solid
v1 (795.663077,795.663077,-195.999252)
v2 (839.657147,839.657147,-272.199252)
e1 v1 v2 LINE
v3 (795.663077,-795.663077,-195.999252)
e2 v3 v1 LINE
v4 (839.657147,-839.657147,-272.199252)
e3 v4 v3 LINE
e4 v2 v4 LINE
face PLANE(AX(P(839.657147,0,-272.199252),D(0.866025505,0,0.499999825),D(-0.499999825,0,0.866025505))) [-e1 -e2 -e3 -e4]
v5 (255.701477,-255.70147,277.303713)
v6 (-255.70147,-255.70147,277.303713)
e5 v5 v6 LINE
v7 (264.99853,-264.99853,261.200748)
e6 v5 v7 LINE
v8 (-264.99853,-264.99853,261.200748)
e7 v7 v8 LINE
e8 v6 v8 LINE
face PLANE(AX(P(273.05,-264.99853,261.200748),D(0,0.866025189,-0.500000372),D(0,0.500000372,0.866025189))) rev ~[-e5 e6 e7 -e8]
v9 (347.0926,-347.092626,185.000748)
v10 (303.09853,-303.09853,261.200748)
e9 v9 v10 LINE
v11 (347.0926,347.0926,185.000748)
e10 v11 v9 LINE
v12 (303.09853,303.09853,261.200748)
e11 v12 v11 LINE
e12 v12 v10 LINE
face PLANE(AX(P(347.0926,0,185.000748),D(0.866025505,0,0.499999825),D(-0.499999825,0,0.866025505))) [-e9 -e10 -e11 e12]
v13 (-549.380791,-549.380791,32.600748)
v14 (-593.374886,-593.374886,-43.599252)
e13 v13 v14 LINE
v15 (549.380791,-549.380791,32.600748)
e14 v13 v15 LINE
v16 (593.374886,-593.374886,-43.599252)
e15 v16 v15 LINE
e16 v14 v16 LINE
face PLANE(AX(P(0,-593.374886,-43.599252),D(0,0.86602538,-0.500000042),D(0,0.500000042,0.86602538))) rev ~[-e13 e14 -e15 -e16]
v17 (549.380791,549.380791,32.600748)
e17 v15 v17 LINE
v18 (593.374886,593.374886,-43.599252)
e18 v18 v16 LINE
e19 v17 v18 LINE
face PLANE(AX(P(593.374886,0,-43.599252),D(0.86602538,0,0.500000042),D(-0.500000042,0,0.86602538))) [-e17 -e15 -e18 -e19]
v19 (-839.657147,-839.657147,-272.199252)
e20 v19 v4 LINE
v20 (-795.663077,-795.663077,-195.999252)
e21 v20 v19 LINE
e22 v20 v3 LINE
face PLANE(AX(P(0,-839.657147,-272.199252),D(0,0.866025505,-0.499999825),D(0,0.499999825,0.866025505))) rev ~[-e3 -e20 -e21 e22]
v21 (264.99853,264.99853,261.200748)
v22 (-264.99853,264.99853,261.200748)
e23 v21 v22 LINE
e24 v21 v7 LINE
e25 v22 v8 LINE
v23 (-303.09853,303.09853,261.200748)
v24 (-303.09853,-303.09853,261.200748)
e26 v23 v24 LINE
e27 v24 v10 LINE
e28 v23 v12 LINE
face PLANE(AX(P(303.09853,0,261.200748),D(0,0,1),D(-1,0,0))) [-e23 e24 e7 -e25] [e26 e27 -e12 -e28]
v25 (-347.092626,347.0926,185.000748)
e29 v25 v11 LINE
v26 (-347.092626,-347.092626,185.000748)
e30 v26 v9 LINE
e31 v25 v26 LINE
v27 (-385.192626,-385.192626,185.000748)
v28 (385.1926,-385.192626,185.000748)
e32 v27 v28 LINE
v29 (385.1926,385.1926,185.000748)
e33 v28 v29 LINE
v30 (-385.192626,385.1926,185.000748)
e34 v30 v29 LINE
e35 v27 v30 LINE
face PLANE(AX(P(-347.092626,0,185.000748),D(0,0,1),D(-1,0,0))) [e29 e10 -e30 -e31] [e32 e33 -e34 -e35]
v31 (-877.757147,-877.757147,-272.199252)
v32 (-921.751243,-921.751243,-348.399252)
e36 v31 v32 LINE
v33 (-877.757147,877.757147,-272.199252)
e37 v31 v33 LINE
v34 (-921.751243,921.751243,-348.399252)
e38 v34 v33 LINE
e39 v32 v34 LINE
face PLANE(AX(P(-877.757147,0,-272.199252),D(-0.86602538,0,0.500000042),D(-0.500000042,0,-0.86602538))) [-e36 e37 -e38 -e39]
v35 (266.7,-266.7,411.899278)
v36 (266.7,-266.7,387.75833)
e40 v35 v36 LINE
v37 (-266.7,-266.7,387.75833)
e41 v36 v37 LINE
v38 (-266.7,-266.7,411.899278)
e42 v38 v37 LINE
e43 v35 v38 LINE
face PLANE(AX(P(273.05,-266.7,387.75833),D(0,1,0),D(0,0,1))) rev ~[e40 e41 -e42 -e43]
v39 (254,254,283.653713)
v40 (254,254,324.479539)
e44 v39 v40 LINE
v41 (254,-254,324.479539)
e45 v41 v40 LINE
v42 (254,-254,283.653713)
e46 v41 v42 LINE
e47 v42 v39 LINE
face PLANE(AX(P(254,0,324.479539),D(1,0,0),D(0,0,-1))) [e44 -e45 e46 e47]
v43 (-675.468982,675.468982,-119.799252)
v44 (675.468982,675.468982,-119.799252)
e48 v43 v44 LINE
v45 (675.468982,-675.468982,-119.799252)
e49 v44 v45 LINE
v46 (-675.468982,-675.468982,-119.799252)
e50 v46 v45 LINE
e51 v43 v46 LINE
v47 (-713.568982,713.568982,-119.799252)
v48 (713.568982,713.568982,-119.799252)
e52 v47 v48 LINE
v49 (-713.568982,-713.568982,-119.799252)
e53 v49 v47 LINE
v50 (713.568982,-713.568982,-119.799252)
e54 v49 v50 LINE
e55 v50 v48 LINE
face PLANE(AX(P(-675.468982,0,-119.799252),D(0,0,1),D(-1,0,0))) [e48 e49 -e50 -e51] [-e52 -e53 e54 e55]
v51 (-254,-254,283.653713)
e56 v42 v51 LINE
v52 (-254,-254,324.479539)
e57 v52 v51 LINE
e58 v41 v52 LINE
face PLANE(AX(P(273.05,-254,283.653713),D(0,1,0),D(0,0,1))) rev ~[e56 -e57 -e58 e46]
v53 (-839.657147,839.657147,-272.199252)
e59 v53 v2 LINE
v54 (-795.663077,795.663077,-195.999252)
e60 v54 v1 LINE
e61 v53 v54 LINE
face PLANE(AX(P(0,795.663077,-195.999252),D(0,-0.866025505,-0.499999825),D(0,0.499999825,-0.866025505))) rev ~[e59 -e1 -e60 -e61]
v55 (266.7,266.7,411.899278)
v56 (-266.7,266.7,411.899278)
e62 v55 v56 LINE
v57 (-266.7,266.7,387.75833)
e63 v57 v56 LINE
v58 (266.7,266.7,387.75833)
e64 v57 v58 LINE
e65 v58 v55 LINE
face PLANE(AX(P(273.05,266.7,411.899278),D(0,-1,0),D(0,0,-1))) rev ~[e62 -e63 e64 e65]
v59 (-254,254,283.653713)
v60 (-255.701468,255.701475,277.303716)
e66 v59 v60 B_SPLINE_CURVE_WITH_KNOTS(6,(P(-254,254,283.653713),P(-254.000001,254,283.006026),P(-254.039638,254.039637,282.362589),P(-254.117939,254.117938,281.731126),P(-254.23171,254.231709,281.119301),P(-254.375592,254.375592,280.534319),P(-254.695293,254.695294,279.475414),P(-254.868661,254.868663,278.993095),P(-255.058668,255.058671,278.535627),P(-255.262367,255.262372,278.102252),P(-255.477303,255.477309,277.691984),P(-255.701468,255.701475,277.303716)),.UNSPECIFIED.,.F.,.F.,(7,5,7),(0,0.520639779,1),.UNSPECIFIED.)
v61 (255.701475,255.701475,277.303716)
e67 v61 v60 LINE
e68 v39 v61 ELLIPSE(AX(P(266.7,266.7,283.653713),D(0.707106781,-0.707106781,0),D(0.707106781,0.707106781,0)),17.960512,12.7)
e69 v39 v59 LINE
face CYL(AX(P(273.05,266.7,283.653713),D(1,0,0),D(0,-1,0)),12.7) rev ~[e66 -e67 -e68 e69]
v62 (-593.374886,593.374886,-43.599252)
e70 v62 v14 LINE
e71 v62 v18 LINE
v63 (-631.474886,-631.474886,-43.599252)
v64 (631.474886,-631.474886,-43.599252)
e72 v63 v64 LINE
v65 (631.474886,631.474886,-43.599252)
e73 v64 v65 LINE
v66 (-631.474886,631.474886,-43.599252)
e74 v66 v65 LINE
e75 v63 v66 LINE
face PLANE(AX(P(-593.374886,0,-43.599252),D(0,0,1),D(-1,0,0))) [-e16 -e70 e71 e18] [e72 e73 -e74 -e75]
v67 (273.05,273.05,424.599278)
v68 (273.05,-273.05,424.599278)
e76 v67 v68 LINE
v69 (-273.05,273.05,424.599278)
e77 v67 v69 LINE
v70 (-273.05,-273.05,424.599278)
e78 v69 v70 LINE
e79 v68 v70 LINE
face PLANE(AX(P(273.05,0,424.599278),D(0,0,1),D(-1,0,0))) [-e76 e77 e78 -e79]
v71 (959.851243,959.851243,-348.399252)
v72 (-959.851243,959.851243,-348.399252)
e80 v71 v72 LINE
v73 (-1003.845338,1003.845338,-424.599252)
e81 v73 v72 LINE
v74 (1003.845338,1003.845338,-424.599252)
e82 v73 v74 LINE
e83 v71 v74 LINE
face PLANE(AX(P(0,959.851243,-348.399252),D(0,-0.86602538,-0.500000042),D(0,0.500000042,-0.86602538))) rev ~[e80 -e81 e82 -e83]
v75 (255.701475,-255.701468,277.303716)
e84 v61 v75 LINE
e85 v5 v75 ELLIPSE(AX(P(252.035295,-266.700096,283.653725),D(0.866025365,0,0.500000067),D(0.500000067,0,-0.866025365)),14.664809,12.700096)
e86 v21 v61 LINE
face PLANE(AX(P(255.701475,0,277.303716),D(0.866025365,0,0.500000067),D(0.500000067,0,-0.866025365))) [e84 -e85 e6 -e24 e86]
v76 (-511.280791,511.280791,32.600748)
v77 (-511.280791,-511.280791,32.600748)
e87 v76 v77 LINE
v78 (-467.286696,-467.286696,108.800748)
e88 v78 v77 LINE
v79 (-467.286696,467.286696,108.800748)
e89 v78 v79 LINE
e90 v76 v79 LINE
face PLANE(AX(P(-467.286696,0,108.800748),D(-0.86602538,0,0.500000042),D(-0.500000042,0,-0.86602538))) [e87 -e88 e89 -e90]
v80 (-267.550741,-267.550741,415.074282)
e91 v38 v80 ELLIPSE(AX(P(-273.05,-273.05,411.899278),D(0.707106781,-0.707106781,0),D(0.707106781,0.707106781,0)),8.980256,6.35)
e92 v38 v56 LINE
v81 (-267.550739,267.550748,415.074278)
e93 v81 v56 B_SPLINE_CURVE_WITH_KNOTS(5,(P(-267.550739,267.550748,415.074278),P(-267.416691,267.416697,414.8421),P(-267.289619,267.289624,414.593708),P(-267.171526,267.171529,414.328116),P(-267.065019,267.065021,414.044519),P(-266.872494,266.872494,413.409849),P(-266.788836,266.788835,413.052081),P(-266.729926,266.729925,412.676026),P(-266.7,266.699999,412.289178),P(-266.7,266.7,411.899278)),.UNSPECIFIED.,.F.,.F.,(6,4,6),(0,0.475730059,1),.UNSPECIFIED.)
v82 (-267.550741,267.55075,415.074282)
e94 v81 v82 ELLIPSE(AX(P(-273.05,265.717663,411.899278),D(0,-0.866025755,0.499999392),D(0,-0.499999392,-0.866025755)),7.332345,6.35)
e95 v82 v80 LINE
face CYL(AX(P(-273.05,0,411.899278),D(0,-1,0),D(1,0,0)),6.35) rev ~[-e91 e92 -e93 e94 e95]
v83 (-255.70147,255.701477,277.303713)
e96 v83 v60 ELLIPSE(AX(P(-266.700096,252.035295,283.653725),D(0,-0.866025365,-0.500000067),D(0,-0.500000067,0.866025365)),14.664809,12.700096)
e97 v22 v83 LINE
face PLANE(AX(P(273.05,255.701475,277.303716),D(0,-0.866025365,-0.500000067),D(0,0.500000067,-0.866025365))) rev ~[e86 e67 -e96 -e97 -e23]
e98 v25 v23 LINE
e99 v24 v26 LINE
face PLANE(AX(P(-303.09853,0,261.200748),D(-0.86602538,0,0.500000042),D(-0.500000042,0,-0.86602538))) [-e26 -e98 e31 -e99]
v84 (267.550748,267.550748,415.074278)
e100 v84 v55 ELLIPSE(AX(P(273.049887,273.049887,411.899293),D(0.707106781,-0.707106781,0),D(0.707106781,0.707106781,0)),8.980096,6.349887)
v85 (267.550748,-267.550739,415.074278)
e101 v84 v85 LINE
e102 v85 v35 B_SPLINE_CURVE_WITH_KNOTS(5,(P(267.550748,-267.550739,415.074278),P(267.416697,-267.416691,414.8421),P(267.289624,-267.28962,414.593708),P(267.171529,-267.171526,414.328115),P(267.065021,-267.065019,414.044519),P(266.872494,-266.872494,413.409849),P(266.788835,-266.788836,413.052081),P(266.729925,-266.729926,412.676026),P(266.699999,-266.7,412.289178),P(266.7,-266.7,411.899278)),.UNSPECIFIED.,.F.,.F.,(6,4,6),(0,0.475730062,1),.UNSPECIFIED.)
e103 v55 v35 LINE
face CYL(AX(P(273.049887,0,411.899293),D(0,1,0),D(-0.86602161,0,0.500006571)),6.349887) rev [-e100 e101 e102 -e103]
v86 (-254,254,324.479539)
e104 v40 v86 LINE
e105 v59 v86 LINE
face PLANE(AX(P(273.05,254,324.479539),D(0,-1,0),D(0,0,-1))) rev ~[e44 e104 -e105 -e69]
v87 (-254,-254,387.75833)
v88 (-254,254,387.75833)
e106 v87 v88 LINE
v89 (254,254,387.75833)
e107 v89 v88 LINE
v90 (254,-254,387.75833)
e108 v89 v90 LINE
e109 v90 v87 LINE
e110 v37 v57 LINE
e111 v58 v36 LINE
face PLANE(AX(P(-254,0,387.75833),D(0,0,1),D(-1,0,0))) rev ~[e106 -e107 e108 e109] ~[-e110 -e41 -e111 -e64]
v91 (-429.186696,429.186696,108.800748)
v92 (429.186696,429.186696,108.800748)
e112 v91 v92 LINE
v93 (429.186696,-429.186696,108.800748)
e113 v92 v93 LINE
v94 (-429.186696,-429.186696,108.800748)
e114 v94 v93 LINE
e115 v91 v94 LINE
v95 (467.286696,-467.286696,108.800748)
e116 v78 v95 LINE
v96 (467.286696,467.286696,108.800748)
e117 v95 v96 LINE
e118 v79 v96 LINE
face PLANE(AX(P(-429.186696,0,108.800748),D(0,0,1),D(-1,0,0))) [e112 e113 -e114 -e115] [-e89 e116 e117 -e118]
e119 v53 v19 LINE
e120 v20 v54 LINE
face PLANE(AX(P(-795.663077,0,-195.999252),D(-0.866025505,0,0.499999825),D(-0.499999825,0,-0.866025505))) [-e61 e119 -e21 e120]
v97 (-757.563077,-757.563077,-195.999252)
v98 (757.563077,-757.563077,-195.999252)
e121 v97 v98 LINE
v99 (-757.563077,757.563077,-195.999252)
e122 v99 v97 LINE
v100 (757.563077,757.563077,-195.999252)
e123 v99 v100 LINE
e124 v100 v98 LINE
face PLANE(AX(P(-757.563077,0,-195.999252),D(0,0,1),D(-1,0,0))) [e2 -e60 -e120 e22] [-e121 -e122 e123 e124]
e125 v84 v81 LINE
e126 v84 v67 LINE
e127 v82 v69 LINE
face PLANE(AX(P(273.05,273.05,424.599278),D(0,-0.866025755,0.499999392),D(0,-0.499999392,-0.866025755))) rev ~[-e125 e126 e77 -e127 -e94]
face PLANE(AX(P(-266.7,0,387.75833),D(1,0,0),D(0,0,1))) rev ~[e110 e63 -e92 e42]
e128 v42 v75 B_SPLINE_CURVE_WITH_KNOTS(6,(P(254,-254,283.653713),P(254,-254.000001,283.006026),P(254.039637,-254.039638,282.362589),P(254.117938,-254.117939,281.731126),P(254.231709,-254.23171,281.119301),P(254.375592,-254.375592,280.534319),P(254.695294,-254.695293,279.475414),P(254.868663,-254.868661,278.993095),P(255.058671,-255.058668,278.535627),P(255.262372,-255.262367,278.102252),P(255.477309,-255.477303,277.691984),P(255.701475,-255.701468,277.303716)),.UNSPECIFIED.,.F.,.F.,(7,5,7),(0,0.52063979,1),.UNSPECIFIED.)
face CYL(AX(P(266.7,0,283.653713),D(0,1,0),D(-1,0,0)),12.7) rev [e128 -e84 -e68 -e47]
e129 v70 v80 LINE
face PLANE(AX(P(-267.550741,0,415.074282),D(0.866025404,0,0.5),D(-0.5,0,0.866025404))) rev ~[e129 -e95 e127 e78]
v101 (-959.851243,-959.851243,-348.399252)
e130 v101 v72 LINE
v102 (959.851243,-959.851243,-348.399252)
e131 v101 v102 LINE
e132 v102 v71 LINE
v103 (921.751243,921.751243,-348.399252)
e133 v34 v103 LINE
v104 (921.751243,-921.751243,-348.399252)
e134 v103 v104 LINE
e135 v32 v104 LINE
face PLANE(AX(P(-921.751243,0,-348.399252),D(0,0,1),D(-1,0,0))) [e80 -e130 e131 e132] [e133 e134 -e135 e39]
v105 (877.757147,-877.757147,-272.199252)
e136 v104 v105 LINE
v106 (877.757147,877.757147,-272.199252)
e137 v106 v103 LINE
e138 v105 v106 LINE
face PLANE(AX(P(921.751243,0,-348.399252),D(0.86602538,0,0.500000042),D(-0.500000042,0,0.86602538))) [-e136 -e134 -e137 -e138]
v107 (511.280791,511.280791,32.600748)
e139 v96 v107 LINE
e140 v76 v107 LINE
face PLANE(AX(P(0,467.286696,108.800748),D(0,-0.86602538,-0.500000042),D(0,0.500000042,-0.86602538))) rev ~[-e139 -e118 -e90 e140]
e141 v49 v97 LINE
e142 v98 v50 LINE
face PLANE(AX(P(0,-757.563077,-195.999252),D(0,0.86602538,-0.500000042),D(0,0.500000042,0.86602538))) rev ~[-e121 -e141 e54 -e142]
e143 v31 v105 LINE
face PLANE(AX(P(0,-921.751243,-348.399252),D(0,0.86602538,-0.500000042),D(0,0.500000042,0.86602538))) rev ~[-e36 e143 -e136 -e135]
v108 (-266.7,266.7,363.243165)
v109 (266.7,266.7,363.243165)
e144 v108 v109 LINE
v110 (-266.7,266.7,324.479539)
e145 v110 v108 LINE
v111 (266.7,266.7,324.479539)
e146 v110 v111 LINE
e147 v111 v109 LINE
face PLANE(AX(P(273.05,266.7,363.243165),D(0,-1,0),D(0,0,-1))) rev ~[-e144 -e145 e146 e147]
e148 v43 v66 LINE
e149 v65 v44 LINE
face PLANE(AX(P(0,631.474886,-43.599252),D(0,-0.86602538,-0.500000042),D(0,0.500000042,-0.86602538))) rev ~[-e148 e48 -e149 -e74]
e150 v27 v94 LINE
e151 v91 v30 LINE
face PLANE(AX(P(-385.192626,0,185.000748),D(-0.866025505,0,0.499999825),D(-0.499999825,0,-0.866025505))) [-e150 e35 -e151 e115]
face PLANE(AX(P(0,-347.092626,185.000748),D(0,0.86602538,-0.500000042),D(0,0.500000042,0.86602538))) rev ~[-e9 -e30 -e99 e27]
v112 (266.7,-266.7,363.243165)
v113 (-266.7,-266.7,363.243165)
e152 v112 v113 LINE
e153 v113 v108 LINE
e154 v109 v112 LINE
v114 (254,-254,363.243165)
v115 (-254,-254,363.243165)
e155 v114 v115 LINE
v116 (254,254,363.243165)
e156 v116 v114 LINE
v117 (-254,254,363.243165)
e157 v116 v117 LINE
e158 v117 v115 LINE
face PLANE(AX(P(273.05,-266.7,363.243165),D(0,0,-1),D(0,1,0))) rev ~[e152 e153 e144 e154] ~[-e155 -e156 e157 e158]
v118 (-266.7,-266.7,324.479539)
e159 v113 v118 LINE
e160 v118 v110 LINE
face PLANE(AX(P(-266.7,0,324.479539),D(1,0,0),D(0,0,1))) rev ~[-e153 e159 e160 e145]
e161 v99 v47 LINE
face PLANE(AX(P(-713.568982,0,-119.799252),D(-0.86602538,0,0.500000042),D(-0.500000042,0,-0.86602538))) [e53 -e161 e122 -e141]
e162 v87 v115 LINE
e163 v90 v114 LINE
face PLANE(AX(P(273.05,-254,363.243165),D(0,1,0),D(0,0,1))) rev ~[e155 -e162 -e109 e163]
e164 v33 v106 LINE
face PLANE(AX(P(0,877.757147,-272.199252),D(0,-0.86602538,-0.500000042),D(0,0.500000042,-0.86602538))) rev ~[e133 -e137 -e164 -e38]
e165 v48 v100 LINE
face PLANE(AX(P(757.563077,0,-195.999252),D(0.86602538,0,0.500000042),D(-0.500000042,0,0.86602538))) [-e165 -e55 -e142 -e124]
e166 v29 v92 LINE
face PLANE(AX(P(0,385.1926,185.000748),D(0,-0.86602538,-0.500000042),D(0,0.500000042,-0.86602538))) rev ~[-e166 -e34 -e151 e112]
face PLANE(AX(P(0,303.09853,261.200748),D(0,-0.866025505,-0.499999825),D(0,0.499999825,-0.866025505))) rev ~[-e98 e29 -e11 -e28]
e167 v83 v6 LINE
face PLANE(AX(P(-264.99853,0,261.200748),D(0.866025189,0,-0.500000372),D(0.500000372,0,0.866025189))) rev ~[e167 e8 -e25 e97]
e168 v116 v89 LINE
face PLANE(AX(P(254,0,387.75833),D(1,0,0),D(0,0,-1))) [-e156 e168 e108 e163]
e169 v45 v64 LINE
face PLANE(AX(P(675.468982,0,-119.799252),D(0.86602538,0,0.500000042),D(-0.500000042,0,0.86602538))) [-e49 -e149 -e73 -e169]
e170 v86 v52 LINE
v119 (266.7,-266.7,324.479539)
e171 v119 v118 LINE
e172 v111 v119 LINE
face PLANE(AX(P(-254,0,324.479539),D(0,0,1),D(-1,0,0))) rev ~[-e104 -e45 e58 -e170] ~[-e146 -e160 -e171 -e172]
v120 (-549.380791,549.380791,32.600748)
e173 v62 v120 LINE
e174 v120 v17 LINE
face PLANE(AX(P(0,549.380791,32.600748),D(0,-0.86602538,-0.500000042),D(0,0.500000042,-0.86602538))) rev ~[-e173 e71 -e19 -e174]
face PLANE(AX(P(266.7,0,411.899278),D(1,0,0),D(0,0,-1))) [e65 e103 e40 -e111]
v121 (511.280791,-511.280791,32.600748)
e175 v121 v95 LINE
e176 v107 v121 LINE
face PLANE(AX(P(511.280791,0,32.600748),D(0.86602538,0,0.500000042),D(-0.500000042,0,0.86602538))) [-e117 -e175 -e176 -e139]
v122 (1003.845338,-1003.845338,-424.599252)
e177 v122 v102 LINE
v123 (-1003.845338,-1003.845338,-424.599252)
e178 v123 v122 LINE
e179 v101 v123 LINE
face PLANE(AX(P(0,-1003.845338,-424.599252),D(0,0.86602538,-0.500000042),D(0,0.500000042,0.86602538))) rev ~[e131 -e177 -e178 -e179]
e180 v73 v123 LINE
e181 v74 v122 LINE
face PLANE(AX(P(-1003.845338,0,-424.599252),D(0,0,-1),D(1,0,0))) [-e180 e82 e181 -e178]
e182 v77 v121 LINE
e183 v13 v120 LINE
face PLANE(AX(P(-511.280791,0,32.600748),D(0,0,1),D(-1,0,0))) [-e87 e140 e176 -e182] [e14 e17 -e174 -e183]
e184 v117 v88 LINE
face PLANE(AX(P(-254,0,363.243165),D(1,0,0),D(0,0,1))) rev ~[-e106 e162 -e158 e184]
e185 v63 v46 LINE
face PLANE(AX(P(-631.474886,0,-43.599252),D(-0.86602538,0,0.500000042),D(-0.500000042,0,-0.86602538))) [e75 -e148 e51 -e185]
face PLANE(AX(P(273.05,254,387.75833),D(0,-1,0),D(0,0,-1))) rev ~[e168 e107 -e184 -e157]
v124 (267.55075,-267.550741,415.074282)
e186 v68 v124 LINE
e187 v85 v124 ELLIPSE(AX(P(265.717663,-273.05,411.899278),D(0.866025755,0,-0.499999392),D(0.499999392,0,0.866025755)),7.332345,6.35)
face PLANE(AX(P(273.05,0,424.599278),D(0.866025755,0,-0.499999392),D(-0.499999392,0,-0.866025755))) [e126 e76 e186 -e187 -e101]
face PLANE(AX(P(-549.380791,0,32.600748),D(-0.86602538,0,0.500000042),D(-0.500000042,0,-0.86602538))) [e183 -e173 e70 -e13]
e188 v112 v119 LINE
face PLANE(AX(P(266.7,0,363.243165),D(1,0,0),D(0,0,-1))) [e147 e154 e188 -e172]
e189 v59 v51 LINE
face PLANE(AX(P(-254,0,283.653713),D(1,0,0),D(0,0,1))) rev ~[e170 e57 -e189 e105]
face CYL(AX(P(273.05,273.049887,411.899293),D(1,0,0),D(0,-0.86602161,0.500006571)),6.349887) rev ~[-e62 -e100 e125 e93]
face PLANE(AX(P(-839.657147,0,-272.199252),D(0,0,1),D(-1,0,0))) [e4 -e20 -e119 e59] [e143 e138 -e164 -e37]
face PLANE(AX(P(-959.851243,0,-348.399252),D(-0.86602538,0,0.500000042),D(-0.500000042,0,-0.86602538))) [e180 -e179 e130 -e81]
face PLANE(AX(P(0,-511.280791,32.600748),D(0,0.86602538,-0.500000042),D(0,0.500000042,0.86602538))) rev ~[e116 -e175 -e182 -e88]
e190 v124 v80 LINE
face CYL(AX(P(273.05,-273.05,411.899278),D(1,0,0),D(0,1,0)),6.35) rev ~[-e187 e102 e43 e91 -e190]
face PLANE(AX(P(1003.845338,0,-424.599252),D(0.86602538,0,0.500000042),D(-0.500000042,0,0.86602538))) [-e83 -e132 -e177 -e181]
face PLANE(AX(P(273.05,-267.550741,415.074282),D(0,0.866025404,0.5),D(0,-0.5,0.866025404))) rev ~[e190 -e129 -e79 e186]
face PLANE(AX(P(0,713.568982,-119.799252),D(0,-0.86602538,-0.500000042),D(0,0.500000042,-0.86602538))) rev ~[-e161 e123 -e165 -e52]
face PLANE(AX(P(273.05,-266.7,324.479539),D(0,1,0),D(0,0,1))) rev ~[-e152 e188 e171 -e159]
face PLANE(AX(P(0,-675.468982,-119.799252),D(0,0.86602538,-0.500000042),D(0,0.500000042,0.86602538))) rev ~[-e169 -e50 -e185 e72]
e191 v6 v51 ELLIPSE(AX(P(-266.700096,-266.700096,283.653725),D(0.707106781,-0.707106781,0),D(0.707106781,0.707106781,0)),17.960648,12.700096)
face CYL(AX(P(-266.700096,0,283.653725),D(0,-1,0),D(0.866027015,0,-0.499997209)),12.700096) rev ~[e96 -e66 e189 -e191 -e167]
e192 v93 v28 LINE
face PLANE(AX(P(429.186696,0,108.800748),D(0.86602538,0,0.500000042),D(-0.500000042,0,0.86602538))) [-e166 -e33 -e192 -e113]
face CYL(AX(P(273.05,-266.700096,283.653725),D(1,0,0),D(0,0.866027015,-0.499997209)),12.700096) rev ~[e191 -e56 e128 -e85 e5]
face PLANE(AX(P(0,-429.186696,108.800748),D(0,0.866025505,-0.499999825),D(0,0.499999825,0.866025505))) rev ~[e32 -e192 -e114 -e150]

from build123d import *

# Parameters (mm, degrees)
F3_DEPTH  = 1003.8461
F4_W      = 2548.7215518951
F4_H      = 1253.2386779785
F5_DEPTH  = 1003.8461
F8_DEPTH  = 273.05
F10_DEPTH = 546.1
F12_DEPTH = 273.05


# Not quite as in the source:
# - ends of sketch curves that miss each other by under 0.0002 mm in the source are joined


with BuildPart() as f3:
    # F2 (on Front) → F3 (new body, symmetric)
    with BuildSketch(Plane.XZ):
        Polygon((-959.8512426, -348.3992524), (-1003.845338, -424.5992524), (76.2, -424.5992524), (1003.845338, -424.5992524), (959.8512426, -348.3992524), (921.7512426, -348.3992524), (877.7571472, -272.1992524), (839.6571472, -272.1992524), (795.6630772, -195.9992524), (757.5630772, -195.9992524), (713.5689818, -119.7992524), (675.4689818, -119.7992524), (631.4748864, -43.5992524), (593.3748864, -43.5992524), (549.380791, 32.6007476), (511.280791, 32.6007476), (467.2866956, 108.8007476), (429.1866956, 108.8007476), (385.1926002, 185.0007476), (347.0926002, 185.0007476), (303.0985302, 261.2007476), (264.9985302, 261.2007476), (-264.9985302, 261.2007476), (-303.0985302, 261.2007476), (-347.0926256, 185.0007476), (-385.1926256, 185.0007476), (-429.1866956, 108.8007476), (-467.2866956, 108.8007476), (-511.280791, 32.6007476), (-549.380791, 32.6007476), (-593.3748864, -43.5992524), (-631.4748864, -43.5992524), (-675.4689818, -119.7992524), (-713.5689818, -119.7992524), (-757.5630772, -195.9992524), (-795.6630772, -195.9992524), (-839.6571472, -272.1992524), (-877.7571472, -272.1992524), (-921.7512426, -348.3992524), align=None)
    extrude(amount=F3_DEPTH, both=True)

    # F4 (on Right) → F5 (cut, symmetric)
    with BuildSketch(Plane.YZ):
        with Locations((-39.1746759415, -156.0024023056)):
            Rectangle(F4_W, F4_H)
        Polygon((1003.845338, -424.5992524), (76.2, -424.5992524), (-1003.845338, -424.5992524), (-959.8512426, -348.3992524), (-921.7512426, -348.3992524), (-877.7571472, -272.1992524), (-839.6571472, -272.1992524), (-795.6630772, -195.9992524), (-757.5630772, -195.9992524), (-713.5689818, -119.7992524), (-675.4689818, -119.7992524), (-631.4748864, -43.5992524), (-593.3748864, -43.5992524), (-549.380791, 32.6007476), (-511.280791, 32.6007476), (-467.2866956, 108.8007476), (-429.1866956, 108.8007476), (-385.1926256, 185.0007476), (-347.0926256, 185.0007476), (-303.0985302, 261.2007476), (-264.9985302, 261.2007476), (264.9985302, 261.2007476), (303.0985302, 261.2007476), (347.0926002, 185.0007476), (385.1926002, 185.0007476), (429.1866956, 108.8007476), (467.2866956, 108.8007476), (511.280791, 32.6007476), (549.380791, 32.6007476), (593.3748864, -43.5992524), (631.4748864, -43.5992524), (675.4689818, -119.7992524), (713.5689818, -119.7992524), (757.5630772, -195.9992524), (795.6630772, -195.9992524), (839.6571472, -272.1992524), (877.7571472, -272.1992524), (921.7512426, -348.3992524), (959.8512426, -348.3992524), align=None, mode=Mode.SUBTRACT)
    extrude(amount=F5_DEPTH, both=True, mode=Mode.SUBTRACT)

    # F6 (on Front) → F8 (join, symmetric)
    with BuildSketch(Plane.XZ):
        Polygon((273.05, 261.2007476), (273.05, 424.5992778), (-273.05, 424.5992778), (-273.05, 261.2007476), (-264.9985302, 261.2007476), (264.9985302, 261.2007476), align=None)
    extrude(amount=F8_DEPTH, both=True)

    # F9 (on face) → F10 (cut, through all)
    with BuildSketch(Plane.YZ.offset(273.05)):
        with BuildLine():
            Line((273.05, 424.5992778), (267.5507476, 415.0742778))
            ThreePointArc((267.5507476, 415.0742778), (266.9163715798, 413.542780889), (266.7, 411.8992778))
            Line((266.7, 411.8992778), (266.7, 404.489539))
            Line((266.7, 404.489539), (266.7, 387.7583304))
            Line((266.7, 387.7583304), (254, 387.7583304))
            Line((254, 387.7583304), (254, 363.2431648))
            Line((254, 363.2431648), (266.7, 363.2431648))
            Line((266.7, 363.2431648), (266.7, 354.1319562))
            Line((266.7, 354.1319562), (266.7, 324.479539))
            Line((266.7, 324.479539), (254, 324.479539))
            Line((254, 324.479539), (254, 283.6537126))
            ThreePointArc((254, 283.6537126), (254.4327415162, 280.3667125557), (255.701475479, 277.3037158787))
            Line((255.701475479, 277.3037158787), (264.9985302, 261.2007476))
            Line((264.9985302, 261.2007476), (273.05, 261.2007476))
            Line((273.05, 261.2007476), (273.05, 424.5992778))
        make_face()
        with BuildLine():
            Line((-264.9985302, 261.2007476), (-255.7014698, 277.3037126))
            ThreePointArc((-255.7014698, 277.3037126), (-254.4327415162, 280.3667125557), (-254, 283.6537126))
            Line((-254, 283.6537126), (-254, 324.479539))
            Line((-254, 324.479539), (-266.7, 324.479539))
            Line((-266.7, 324.479539), (-266.7, 354.1319562))
            Line((-266.7, 354.1319562), (-266.7, 363.2431648))
            Line((-266.7, 363.2431648), (-254, 363.2431648))
            Line((-254, 363.2431648), (-254, 387.7583304))
            Line((-254, 387.7583304), (-266.7, 387.7583304))
            Line((-266.7, 387.7583304), (-266.7, 404.489539))
            Line((-266.7, 404.489539), (-266.7, 411.8992778))
            ThreePointArc((-266.7, 411.8992778), (-266.9163715798, 413.542780889), (-267.5507409145, 415.0742816599))
            Line((-267.5507409145, 415.0742816599), (-273.05, 424.5992778))
            Line((-273.05, 424.5992778), (-273.05, 261.2007476))
            Line((-273.05, 261.2007476), (-264.9985302, 261.2007476))
        make_face()
    extrude(amount=-F10_DEPTH, mode=Mode.SUBTRACT)

    # F11 (on Front) → F12 (cut, symmetric)
    with BuildSketch(Plane.XZ):
        with BuildLine():
            ThreePointArc((254, 283.6537126), (254.4327415162, 280.3667125557), (255.701475479, 277.3037158787))
            Line((255.701475479, 277.3037158787), (264.9985302, 261.2007476))
            Line((264.9985302, 261.2007476), (273.05, 261.2007476))
            Line((273.05, 261.2007476), (273.05, 424.5992778))
            Line((273.05, 424.5992778), (267.5507476, 415.0742778))
            ThreePointArc((267.5507476, 415.0742778), (266.9163715798, 413.542780889), (266.7, 411.8992778))
            Line((266.7, 411.8992778), (266.7, 404.489539))
            Line((266.7, 404.489539), (266.7, 387.7583304))
            Line((266.7, 387.7583304), (254, 387.7583304))
            Line((254, 387.7583304), (254, 363.2431648))
            Line((254, 363.2431648), (266.7, 363.2431648))
            Line((266.7, 363.2431648), (266.7, 354.1319562))
            Line((266.7, 354.1319562), (266.7, 324.479539))
            Line((266.7, 324.479539), (254, 324.479539))
            Line((254, 324.479539), (254, 283.6537126))
        make_face()
        with BuildLine():
            ThreePointArc((-266.7, 411.8992778), (-266.9163715798, 413.542780889), (-267.5507409145, 415.0742816599))
            Line((-267.5507409145, 415.0742816599), (-273.05, 424.5992778))
            Line((-273.05, 424.5992778), (-273.05, 261.2007476))
            Line((-273.05, 261.2007476), (-264.9985302, 261.2007476))
            Line((-264.9985302, 261.2007476), (-255.7014698, 277.3037126))
            ThreePointArc((-255.7014698, 277.3037126), (-254.4327415162, 280.3667125557), (-254, 283.6537126))
            Line((-254, 283.6537126), (-254, 324.479539))
            Line((-254, 324.479539), (-266.7, 324.479539))
            Line((-266.7, 324.479539), (-266.7, 354.1319562))
            Line((-266.7, 354.1319562), (-266.7, 363.2431648))
            Line((-266.7, 363.2431648), (-254, 363.2431648))
            Line((-254, 363.2431648), (-254, 387.7583304))
            Line((-254, 387.7583304), (-266.7, 387.7583304))
            Line((-266.7, 387.7583304), (-266.7, 404.489539))
            Line((-266.7, 404.489539), (-266.7, 411.8992778))
        make_face()
    extrude(amount=F12_DEPTH, both=True, mode=Mode.SUBTRACT)


solid = f3.part
